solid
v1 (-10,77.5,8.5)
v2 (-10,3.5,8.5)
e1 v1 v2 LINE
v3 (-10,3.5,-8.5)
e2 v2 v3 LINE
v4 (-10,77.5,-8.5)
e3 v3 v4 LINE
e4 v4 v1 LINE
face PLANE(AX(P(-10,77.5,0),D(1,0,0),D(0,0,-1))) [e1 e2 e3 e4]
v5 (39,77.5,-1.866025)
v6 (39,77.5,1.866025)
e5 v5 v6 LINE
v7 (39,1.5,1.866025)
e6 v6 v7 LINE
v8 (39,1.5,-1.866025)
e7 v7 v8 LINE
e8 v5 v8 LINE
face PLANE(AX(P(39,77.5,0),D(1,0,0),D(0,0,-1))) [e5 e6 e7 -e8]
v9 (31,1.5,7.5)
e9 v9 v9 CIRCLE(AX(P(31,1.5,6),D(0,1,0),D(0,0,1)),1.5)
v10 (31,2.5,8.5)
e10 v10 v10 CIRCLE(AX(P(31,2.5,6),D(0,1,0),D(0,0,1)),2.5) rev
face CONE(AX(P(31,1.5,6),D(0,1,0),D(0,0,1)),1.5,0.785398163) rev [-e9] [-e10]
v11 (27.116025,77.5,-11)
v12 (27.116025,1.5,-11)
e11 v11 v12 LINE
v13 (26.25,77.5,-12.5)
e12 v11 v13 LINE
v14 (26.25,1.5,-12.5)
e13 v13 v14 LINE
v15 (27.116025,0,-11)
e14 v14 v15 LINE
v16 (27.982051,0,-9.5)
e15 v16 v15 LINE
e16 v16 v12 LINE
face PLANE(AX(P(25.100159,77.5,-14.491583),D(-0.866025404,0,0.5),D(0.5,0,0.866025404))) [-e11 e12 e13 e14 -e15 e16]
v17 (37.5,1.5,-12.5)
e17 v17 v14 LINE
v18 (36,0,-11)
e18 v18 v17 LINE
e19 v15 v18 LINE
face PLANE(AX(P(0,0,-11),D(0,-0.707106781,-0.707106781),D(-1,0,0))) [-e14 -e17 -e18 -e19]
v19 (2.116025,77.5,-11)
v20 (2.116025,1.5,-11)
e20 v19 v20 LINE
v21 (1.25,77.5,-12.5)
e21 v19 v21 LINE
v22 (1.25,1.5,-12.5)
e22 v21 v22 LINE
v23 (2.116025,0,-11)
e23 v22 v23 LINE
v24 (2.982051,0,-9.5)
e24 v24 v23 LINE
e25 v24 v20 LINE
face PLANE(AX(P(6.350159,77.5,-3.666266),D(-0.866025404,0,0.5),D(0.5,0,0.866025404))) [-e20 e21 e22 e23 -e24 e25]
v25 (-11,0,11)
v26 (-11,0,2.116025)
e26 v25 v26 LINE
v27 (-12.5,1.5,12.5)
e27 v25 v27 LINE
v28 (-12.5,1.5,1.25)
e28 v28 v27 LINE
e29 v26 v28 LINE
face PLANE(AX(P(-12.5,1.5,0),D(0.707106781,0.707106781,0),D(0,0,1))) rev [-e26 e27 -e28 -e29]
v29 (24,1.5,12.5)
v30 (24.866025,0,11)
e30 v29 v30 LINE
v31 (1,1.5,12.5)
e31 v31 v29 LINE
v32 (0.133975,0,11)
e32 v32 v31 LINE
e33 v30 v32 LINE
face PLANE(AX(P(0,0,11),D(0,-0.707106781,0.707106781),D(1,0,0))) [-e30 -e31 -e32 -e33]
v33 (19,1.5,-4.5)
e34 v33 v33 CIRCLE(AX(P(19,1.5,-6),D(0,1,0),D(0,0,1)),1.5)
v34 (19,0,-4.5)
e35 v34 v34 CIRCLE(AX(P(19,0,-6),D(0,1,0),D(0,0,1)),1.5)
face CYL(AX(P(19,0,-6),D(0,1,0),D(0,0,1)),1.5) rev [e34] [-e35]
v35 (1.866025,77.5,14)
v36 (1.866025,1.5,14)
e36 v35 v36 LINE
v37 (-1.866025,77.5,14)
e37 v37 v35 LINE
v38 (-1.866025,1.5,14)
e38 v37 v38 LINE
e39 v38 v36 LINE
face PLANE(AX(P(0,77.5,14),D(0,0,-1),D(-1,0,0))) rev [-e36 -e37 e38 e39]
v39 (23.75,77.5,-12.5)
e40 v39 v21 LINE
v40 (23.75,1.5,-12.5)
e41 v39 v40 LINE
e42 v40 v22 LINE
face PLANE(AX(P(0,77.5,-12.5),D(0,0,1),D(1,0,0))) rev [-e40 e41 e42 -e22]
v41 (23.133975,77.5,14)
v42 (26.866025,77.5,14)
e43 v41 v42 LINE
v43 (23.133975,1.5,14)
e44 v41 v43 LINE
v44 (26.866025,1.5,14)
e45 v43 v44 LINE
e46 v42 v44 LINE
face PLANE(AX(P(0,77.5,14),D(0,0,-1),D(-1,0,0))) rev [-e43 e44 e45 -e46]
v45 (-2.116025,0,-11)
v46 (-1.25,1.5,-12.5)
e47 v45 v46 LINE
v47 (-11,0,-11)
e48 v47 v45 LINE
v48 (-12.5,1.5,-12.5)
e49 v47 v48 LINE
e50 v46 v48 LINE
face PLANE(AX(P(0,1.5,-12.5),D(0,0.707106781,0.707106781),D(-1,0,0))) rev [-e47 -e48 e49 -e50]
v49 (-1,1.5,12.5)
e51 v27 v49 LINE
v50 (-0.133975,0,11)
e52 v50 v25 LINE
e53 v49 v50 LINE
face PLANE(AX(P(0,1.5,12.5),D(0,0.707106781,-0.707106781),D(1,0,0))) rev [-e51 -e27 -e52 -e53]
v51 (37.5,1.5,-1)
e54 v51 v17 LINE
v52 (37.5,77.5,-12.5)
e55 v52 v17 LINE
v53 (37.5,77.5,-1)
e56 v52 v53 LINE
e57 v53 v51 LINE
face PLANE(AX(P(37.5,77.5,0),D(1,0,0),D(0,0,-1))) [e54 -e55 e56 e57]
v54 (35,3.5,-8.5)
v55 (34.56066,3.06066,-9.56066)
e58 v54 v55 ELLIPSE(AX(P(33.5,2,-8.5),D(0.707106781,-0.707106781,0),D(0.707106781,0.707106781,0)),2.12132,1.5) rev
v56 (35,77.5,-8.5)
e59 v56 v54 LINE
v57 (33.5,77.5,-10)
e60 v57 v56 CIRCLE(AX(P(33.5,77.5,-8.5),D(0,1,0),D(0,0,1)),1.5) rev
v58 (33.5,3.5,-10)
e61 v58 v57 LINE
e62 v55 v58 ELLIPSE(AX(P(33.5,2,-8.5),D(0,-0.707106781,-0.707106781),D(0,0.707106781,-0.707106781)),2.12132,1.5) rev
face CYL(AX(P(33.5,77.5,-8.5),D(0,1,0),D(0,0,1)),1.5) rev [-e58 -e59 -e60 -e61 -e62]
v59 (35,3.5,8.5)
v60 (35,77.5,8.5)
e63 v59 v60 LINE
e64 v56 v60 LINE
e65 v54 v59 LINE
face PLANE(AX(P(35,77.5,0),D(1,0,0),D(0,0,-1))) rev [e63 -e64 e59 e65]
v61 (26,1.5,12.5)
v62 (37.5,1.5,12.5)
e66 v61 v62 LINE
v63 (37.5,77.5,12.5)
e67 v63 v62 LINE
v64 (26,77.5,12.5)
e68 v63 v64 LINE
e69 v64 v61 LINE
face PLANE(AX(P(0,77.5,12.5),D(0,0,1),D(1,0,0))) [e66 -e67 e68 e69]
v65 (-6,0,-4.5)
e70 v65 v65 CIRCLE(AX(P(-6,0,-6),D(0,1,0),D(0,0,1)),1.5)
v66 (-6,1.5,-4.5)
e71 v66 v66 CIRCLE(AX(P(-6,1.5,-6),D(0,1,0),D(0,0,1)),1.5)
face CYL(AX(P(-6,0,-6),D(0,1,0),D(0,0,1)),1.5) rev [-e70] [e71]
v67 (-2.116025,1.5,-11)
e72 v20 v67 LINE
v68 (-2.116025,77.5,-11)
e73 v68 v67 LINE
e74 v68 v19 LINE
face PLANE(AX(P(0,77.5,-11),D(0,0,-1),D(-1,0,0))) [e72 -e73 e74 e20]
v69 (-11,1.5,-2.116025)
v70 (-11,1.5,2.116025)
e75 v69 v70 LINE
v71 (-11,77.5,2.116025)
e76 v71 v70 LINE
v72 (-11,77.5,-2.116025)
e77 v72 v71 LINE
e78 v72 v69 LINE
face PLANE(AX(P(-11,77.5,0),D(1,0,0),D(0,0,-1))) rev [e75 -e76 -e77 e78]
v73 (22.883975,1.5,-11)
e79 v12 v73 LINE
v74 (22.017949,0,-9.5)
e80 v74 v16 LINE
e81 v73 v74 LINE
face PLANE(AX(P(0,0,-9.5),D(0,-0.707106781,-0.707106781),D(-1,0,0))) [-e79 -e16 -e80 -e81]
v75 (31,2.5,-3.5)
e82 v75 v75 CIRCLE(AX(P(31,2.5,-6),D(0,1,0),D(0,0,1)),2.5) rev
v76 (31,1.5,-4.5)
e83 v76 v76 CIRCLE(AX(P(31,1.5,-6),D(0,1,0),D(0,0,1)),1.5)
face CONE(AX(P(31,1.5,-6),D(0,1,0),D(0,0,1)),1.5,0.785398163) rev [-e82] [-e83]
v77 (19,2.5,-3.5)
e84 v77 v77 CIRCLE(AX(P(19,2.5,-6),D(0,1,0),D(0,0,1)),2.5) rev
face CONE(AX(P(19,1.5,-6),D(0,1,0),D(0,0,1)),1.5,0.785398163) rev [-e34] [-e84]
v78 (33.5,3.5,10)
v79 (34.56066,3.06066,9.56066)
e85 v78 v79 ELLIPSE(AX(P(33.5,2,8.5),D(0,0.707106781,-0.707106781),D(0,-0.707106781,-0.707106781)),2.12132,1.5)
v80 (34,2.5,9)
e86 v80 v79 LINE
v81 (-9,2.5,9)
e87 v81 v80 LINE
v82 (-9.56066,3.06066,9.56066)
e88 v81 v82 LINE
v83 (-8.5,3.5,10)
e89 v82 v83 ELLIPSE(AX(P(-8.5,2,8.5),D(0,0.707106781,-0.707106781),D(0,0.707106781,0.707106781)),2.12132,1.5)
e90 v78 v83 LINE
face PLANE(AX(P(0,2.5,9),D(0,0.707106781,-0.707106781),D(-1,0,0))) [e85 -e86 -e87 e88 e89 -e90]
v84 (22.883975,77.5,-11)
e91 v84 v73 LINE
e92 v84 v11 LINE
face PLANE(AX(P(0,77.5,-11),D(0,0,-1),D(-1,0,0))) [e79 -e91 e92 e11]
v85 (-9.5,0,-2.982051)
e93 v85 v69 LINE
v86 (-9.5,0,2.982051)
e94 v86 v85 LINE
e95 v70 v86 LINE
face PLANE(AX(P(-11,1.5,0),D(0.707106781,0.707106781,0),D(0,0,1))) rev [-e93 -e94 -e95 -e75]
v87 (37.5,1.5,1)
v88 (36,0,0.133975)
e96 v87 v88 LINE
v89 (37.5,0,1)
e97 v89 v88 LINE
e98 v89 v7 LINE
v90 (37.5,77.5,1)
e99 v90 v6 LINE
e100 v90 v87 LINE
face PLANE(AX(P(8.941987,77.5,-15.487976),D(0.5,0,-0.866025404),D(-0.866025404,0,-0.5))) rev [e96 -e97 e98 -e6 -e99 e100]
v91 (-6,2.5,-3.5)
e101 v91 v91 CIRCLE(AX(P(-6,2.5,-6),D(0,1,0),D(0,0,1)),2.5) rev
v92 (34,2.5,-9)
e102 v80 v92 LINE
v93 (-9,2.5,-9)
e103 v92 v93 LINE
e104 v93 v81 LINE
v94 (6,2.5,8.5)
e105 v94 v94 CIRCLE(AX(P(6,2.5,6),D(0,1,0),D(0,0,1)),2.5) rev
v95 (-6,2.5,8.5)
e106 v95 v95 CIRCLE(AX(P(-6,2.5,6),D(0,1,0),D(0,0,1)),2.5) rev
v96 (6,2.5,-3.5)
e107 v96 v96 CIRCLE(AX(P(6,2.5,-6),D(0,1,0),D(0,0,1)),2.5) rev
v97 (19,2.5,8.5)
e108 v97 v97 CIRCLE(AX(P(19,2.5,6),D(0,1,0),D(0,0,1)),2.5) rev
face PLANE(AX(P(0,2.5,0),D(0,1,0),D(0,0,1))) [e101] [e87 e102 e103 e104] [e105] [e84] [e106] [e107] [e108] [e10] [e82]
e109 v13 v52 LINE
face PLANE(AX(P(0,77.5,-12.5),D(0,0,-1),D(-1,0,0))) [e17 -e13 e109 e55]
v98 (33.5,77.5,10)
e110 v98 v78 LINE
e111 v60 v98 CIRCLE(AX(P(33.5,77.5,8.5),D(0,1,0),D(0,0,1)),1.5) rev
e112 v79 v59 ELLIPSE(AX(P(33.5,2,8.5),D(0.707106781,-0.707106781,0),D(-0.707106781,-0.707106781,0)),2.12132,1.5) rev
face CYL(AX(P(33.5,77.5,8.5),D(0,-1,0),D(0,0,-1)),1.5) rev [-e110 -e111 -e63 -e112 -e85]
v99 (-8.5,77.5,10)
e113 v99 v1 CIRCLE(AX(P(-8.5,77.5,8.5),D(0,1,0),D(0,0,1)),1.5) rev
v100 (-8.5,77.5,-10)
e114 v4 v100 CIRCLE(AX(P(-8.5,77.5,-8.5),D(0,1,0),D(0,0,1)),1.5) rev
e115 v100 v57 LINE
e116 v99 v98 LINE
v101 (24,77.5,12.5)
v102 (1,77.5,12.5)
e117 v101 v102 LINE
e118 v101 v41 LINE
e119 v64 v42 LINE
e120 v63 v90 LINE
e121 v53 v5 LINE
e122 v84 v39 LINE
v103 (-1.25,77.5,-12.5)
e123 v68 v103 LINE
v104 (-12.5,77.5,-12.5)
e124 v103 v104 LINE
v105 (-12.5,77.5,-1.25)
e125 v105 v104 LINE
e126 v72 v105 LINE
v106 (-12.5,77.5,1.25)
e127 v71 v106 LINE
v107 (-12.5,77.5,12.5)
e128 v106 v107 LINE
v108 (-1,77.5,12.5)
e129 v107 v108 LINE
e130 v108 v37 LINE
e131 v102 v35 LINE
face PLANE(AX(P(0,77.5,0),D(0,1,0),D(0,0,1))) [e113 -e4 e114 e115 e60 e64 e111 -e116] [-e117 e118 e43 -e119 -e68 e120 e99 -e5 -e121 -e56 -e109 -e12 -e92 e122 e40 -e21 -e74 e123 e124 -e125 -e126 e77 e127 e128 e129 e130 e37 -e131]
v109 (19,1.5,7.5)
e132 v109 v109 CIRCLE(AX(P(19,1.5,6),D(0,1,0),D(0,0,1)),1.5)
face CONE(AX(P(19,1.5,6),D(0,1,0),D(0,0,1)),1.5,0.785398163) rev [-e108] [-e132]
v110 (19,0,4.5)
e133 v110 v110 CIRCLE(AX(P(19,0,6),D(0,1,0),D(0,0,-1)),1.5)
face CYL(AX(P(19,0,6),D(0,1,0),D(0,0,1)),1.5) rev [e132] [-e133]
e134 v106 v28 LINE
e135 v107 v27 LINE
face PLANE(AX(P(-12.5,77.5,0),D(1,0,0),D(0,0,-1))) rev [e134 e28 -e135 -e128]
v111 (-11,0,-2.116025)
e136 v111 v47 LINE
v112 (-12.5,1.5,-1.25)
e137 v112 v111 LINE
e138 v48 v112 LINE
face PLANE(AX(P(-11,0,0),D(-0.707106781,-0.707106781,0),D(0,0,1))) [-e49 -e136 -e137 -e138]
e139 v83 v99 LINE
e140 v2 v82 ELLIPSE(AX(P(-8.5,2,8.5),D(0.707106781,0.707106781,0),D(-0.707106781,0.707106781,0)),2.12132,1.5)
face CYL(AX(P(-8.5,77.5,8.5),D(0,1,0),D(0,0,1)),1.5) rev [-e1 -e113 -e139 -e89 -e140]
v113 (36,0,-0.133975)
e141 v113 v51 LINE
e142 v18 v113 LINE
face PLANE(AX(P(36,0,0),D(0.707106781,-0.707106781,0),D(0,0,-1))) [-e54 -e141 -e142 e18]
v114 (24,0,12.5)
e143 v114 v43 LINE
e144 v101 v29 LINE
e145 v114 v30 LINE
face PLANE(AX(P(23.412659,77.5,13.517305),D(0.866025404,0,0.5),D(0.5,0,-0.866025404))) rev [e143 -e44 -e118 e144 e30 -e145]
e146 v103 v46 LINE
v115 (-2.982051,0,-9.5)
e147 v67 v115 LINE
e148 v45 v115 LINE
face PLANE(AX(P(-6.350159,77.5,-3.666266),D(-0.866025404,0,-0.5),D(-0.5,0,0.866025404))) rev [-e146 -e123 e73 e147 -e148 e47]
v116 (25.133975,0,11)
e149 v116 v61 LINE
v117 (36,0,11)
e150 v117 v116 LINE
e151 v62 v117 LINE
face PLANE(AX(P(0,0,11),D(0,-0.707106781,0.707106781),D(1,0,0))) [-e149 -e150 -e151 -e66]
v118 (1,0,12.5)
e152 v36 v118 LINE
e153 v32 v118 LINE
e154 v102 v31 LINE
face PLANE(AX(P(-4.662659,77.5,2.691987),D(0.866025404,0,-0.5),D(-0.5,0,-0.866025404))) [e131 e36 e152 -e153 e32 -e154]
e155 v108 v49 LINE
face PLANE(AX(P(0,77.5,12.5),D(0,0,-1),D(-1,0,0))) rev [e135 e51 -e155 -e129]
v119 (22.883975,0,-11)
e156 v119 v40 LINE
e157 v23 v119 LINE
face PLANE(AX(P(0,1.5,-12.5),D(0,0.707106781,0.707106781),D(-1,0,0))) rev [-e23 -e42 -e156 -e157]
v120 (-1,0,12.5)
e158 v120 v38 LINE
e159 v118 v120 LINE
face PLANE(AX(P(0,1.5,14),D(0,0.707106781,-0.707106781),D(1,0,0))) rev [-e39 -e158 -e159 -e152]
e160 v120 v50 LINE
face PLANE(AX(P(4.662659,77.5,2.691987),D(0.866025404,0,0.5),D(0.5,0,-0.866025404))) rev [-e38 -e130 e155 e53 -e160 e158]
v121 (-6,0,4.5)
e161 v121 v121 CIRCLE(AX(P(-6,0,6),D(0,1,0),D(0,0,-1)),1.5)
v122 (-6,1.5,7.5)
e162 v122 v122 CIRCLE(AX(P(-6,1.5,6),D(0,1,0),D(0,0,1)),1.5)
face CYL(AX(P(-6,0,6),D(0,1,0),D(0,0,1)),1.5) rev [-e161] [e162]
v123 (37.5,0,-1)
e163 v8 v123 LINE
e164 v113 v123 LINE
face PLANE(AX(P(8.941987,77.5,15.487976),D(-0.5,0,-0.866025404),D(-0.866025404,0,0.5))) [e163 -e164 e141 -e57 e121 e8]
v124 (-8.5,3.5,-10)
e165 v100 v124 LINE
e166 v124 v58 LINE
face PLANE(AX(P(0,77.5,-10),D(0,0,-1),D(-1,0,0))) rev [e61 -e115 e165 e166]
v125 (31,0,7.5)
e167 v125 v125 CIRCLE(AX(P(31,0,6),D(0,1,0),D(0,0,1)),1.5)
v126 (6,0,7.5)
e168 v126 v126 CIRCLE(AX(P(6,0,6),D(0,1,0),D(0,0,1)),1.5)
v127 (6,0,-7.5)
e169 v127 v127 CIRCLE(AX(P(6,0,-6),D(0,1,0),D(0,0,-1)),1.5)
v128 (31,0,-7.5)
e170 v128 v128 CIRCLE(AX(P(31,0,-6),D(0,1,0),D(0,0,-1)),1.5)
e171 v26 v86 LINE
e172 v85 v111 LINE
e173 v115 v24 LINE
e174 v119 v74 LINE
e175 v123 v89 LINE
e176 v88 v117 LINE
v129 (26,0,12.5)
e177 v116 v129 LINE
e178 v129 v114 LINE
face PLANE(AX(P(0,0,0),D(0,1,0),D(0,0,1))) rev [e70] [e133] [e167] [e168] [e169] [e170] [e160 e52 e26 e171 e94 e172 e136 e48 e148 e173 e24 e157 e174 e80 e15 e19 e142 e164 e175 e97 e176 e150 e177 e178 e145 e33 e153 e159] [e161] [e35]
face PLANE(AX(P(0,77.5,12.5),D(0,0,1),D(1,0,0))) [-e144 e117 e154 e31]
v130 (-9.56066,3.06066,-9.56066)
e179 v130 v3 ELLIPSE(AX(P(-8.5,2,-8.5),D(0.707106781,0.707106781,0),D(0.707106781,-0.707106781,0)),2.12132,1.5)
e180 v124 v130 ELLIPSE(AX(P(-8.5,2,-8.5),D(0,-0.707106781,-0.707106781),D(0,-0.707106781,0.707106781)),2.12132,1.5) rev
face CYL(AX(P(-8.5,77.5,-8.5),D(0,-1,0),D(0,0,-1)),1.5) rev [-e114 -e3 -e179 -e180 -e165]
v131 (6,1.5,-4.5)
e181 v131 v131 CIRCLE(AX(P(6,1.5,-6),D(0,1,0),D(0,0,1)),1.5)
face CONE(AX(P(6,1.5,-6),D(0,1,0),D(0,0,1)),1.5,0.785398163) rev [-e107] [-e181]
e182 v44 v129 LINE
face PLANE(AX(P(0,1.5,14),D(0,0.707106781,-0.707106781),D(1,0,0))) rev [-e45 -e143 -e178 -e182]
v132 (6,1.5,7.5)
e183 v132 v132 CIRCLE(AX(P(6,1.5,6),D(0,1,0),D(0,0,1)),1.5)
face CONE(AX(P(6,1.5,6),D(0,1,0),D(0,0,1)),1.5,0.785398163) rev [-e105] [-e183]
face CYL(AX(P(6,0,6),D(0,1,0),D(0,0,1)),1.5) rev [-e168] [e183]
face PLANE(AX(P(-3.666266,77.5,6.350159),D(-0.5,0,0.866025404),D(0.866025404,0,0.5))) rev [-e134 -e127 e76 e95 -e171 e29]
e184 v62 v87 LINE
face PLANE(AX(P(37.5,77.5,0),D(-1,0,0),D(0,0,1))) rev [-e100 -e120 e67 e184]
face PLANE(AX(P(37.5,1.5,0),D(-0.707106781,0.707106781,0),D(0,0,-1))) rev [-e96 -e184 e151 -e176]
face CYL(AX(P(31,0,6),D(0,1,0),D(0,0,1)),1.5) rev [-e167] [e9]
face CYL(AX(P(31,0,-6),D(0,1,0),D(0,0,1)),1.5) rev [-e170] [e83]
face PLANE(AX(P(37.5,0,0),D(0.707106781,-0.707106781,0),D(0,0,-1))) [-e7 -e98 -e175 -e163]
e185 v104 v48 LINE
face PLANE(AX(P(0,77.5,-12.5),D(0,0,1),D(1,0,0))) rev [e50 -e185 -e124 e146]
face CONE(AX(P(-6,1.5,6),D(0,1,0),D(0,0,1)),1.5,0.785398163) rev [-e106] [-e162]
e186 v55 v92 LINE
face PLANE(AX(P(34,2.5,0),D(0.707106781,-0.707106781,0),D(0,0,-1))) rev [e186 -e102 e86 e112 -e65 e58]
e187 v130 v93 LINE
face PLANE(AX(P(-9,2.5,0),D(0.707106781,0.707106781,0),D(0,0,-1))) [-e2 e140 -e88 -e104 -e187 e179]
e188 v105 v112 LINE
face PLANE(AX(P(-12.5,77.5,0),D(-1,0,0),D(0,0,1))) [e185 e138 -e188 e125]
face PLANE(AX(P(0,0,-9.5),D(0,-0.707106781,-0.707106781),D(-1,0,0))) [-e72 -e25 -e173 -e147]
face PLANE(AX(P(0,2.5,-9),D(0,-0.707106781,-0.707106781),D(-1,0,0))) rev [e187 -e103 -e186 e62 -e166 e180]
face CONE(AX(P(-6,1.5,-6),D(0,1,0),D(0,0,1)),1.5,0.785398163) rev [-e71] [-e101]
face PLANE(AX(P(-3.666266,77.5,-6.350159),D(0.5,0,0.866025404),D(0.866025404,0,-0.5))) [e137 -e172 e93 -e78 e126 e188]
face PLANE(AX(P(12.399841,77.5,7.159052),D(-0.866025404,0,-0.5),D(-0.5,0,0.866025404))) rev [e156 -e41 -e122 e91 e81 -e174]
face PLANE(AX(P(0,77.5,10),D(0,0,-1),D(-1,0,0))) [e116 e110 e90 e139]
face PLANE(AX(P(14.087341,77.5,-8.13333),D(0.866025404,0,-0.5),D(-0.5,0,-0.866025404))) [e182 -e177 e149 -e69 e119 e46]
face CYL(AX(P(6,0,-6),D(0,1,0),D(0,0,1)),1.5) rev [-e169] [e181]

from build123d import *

# Parameters (mm, degrees)
BOSS_EXTRUDE1_DEPTH     = 77.5
SKETCH2_W               = 45
SKETCH2_H               = 20
BOSS_EXTRUDE2_DEPTH     = 2.5
CUT_EXTRUDE1_DEPTH      = 86.685471347
CUT_EXTRUDE1_DEPTH_BACK = 86.685471347
SKETCH3_R               = 1.5
CHAMFER3_SIZE           = 1.5
CHAMFER2_SIZE           = 1
FILLET1_R               = 1.5


with BuildPart() as part:
    # Sketch1 → Boss-Extrude1 (new body)
    with BuildSketch(Plane(origin=(0, 0, 0), x_dir=(1, 0, 0), z_dir=(0, 1, 0))):
        Polygon((12.5, -12.5), (1, -12.5), (1.866025404, -14), (-1.866025404, -14), (-1, -12.5), (-12.5, -12.5), (-12.5, -1.25), (-11, -2.116025404), (-11, 2.116025404), (-12.5, 1.25), (-12.5, 12.5), (-1.25, 12.5), (-2.116025404, 11), (2.116025404, 11), (1.25, 12.5), (12.5, 12.5), (23.75, 12.5), (22.883974596, 11), (27.116025404, 11), (26.25, 12.5), (37.5, 12.5), (37.5, 1), (39, 1.866025404), (39, -1.866025404), (37.5, -1), (37.5, -12.5), (26, -12.5), (26.866025404, -14), (23.133974596, -14), (24, -12.5), align=None)
        Polygon((15, -10), (35, -10), (35, 10), (15, 10), (10, 10), (-10, 10), (-10, -10), (10, -10), align=None, mode=Mode.SUBTRACT)
    extrude(amount=BOSS_EXTRUDE1_DEPTH)

    # Sketch2 → Boss-Extrude2 (add)
    with BuildSketch(Plane(origin=(0, 0, 0), x_dir=(1, 0, 0), z_dir=(0, 1, 0))):
        with Locations((12.5, 0)):
            Rectangle(SKETCH2_W, SKETCH2_H)
    extrude(amount=BOSS_EXTRUDE2_DEPTH)

    # Sketch3 → Cut-Extrude1 (cut, two sides: drawn at the far end of the back side and taken through both)
    with BuildSketch(Plane(origin=(0, 2.5, 0), x_dir=(1, 0, 0), z_dir=(0, 1, 0)).offset(-CUT_EXTRUDE1_DEPTH_BACK)):
        with Locations(Location((-6, 6, 0), (0, 0, 270))):
            Circle(SKETCH3_R)
        with Locations(Location((6, 6, 0), (0, 0, 270))):
            Circle(SKETCH3_R)
        with Locations(Location((6, -6, 0), (0, 0, 270))):
            Circle(SKETCH3_R)
        with Locations(Location((-6, -6, 0), (0, 0, 270))):
            Circle(SKETCH3_R)
        with Locations(Location((31, -6, 0), (0, 0, 270))):
            Circle(SKETCH3_R)
        with Locations(Location((19, -6, 0), (0, 0, 270))):
            Circle(SKETCH3_R)
        with Locations(Location((19, 6, 0), (0, 0, 270))):
            Circle(SKETCH3_R)
        with Locations(Location((31, 6, 0), (0, 0, 270))):
            Circle(SKETCH3_R)
    extrude(amount=CUT_EXTRUDE1_DEPTH + CUT_EXTRUDE1_DEPTH_BACK, mode=Mode.SUBTRACT)

    # Chamfer3
    chamfer3_edges = [part.edges().sort_by_distance(p)[0] for p in [
        (-11, 0, 0),
        (0, 0, 14),
        (25, 0, 14),
        (39, 0, 0),
        (0, 0, -11),
        (25, 0, -11),
        (-6.875, 0, -12.5),
        (-12.5, 0, -6.875),
        (-12.5, 0, 6.875),
        (-6.75, 0, 12.5),
        (12.5, 0, 12.5),
        (37.5, 0, 6.75),
        (31.75, 0, 12.5),
        (37.5, 0, -6.75),
        (31.875, 0, -12.5),
        (12.5, 0, -12.5),
    ]]
    chamfer(chamfer3_edges, length=CHAMFER3_SIZE - 0.0001)  # a hair under: the kernel refuses the full size

    # Chamfer2
    chamfer2_edges = [part.edges().sort_by_distance(p)[0] for p in [
        (12.5, 2.5, -10),
        (-10, 2.5, 0),
        (12.5, 2.5, 10),
        (35, 2.5, 0),
        (31, 2.5, 4.5),
        (-6, 2.5, 4.5),
        (6, 2.5, 4.5),
        (6, 2.5, -7.5),
        (19, 2.5, 4.5),
        (19, 2.5, -7.5),
        (31, 2.5, -7.5),
        (-6, 2.5, -7.5),
    ]]
    chamfer(chamfer2_edges, length=CHAMFER2_SIZE)

    # Fillet1
    fillet1_edges = [part.edges().sort_by_distance(p)[0] for p in [
        (35, 40.5, 10),
        (35, 40.5, -10),
        (-10, 40.5, -10),
        (-10, 40.5, 10),
    ]]
    fillet(fillet1_edges, radius=FILLET1_R)


solid = part.part
